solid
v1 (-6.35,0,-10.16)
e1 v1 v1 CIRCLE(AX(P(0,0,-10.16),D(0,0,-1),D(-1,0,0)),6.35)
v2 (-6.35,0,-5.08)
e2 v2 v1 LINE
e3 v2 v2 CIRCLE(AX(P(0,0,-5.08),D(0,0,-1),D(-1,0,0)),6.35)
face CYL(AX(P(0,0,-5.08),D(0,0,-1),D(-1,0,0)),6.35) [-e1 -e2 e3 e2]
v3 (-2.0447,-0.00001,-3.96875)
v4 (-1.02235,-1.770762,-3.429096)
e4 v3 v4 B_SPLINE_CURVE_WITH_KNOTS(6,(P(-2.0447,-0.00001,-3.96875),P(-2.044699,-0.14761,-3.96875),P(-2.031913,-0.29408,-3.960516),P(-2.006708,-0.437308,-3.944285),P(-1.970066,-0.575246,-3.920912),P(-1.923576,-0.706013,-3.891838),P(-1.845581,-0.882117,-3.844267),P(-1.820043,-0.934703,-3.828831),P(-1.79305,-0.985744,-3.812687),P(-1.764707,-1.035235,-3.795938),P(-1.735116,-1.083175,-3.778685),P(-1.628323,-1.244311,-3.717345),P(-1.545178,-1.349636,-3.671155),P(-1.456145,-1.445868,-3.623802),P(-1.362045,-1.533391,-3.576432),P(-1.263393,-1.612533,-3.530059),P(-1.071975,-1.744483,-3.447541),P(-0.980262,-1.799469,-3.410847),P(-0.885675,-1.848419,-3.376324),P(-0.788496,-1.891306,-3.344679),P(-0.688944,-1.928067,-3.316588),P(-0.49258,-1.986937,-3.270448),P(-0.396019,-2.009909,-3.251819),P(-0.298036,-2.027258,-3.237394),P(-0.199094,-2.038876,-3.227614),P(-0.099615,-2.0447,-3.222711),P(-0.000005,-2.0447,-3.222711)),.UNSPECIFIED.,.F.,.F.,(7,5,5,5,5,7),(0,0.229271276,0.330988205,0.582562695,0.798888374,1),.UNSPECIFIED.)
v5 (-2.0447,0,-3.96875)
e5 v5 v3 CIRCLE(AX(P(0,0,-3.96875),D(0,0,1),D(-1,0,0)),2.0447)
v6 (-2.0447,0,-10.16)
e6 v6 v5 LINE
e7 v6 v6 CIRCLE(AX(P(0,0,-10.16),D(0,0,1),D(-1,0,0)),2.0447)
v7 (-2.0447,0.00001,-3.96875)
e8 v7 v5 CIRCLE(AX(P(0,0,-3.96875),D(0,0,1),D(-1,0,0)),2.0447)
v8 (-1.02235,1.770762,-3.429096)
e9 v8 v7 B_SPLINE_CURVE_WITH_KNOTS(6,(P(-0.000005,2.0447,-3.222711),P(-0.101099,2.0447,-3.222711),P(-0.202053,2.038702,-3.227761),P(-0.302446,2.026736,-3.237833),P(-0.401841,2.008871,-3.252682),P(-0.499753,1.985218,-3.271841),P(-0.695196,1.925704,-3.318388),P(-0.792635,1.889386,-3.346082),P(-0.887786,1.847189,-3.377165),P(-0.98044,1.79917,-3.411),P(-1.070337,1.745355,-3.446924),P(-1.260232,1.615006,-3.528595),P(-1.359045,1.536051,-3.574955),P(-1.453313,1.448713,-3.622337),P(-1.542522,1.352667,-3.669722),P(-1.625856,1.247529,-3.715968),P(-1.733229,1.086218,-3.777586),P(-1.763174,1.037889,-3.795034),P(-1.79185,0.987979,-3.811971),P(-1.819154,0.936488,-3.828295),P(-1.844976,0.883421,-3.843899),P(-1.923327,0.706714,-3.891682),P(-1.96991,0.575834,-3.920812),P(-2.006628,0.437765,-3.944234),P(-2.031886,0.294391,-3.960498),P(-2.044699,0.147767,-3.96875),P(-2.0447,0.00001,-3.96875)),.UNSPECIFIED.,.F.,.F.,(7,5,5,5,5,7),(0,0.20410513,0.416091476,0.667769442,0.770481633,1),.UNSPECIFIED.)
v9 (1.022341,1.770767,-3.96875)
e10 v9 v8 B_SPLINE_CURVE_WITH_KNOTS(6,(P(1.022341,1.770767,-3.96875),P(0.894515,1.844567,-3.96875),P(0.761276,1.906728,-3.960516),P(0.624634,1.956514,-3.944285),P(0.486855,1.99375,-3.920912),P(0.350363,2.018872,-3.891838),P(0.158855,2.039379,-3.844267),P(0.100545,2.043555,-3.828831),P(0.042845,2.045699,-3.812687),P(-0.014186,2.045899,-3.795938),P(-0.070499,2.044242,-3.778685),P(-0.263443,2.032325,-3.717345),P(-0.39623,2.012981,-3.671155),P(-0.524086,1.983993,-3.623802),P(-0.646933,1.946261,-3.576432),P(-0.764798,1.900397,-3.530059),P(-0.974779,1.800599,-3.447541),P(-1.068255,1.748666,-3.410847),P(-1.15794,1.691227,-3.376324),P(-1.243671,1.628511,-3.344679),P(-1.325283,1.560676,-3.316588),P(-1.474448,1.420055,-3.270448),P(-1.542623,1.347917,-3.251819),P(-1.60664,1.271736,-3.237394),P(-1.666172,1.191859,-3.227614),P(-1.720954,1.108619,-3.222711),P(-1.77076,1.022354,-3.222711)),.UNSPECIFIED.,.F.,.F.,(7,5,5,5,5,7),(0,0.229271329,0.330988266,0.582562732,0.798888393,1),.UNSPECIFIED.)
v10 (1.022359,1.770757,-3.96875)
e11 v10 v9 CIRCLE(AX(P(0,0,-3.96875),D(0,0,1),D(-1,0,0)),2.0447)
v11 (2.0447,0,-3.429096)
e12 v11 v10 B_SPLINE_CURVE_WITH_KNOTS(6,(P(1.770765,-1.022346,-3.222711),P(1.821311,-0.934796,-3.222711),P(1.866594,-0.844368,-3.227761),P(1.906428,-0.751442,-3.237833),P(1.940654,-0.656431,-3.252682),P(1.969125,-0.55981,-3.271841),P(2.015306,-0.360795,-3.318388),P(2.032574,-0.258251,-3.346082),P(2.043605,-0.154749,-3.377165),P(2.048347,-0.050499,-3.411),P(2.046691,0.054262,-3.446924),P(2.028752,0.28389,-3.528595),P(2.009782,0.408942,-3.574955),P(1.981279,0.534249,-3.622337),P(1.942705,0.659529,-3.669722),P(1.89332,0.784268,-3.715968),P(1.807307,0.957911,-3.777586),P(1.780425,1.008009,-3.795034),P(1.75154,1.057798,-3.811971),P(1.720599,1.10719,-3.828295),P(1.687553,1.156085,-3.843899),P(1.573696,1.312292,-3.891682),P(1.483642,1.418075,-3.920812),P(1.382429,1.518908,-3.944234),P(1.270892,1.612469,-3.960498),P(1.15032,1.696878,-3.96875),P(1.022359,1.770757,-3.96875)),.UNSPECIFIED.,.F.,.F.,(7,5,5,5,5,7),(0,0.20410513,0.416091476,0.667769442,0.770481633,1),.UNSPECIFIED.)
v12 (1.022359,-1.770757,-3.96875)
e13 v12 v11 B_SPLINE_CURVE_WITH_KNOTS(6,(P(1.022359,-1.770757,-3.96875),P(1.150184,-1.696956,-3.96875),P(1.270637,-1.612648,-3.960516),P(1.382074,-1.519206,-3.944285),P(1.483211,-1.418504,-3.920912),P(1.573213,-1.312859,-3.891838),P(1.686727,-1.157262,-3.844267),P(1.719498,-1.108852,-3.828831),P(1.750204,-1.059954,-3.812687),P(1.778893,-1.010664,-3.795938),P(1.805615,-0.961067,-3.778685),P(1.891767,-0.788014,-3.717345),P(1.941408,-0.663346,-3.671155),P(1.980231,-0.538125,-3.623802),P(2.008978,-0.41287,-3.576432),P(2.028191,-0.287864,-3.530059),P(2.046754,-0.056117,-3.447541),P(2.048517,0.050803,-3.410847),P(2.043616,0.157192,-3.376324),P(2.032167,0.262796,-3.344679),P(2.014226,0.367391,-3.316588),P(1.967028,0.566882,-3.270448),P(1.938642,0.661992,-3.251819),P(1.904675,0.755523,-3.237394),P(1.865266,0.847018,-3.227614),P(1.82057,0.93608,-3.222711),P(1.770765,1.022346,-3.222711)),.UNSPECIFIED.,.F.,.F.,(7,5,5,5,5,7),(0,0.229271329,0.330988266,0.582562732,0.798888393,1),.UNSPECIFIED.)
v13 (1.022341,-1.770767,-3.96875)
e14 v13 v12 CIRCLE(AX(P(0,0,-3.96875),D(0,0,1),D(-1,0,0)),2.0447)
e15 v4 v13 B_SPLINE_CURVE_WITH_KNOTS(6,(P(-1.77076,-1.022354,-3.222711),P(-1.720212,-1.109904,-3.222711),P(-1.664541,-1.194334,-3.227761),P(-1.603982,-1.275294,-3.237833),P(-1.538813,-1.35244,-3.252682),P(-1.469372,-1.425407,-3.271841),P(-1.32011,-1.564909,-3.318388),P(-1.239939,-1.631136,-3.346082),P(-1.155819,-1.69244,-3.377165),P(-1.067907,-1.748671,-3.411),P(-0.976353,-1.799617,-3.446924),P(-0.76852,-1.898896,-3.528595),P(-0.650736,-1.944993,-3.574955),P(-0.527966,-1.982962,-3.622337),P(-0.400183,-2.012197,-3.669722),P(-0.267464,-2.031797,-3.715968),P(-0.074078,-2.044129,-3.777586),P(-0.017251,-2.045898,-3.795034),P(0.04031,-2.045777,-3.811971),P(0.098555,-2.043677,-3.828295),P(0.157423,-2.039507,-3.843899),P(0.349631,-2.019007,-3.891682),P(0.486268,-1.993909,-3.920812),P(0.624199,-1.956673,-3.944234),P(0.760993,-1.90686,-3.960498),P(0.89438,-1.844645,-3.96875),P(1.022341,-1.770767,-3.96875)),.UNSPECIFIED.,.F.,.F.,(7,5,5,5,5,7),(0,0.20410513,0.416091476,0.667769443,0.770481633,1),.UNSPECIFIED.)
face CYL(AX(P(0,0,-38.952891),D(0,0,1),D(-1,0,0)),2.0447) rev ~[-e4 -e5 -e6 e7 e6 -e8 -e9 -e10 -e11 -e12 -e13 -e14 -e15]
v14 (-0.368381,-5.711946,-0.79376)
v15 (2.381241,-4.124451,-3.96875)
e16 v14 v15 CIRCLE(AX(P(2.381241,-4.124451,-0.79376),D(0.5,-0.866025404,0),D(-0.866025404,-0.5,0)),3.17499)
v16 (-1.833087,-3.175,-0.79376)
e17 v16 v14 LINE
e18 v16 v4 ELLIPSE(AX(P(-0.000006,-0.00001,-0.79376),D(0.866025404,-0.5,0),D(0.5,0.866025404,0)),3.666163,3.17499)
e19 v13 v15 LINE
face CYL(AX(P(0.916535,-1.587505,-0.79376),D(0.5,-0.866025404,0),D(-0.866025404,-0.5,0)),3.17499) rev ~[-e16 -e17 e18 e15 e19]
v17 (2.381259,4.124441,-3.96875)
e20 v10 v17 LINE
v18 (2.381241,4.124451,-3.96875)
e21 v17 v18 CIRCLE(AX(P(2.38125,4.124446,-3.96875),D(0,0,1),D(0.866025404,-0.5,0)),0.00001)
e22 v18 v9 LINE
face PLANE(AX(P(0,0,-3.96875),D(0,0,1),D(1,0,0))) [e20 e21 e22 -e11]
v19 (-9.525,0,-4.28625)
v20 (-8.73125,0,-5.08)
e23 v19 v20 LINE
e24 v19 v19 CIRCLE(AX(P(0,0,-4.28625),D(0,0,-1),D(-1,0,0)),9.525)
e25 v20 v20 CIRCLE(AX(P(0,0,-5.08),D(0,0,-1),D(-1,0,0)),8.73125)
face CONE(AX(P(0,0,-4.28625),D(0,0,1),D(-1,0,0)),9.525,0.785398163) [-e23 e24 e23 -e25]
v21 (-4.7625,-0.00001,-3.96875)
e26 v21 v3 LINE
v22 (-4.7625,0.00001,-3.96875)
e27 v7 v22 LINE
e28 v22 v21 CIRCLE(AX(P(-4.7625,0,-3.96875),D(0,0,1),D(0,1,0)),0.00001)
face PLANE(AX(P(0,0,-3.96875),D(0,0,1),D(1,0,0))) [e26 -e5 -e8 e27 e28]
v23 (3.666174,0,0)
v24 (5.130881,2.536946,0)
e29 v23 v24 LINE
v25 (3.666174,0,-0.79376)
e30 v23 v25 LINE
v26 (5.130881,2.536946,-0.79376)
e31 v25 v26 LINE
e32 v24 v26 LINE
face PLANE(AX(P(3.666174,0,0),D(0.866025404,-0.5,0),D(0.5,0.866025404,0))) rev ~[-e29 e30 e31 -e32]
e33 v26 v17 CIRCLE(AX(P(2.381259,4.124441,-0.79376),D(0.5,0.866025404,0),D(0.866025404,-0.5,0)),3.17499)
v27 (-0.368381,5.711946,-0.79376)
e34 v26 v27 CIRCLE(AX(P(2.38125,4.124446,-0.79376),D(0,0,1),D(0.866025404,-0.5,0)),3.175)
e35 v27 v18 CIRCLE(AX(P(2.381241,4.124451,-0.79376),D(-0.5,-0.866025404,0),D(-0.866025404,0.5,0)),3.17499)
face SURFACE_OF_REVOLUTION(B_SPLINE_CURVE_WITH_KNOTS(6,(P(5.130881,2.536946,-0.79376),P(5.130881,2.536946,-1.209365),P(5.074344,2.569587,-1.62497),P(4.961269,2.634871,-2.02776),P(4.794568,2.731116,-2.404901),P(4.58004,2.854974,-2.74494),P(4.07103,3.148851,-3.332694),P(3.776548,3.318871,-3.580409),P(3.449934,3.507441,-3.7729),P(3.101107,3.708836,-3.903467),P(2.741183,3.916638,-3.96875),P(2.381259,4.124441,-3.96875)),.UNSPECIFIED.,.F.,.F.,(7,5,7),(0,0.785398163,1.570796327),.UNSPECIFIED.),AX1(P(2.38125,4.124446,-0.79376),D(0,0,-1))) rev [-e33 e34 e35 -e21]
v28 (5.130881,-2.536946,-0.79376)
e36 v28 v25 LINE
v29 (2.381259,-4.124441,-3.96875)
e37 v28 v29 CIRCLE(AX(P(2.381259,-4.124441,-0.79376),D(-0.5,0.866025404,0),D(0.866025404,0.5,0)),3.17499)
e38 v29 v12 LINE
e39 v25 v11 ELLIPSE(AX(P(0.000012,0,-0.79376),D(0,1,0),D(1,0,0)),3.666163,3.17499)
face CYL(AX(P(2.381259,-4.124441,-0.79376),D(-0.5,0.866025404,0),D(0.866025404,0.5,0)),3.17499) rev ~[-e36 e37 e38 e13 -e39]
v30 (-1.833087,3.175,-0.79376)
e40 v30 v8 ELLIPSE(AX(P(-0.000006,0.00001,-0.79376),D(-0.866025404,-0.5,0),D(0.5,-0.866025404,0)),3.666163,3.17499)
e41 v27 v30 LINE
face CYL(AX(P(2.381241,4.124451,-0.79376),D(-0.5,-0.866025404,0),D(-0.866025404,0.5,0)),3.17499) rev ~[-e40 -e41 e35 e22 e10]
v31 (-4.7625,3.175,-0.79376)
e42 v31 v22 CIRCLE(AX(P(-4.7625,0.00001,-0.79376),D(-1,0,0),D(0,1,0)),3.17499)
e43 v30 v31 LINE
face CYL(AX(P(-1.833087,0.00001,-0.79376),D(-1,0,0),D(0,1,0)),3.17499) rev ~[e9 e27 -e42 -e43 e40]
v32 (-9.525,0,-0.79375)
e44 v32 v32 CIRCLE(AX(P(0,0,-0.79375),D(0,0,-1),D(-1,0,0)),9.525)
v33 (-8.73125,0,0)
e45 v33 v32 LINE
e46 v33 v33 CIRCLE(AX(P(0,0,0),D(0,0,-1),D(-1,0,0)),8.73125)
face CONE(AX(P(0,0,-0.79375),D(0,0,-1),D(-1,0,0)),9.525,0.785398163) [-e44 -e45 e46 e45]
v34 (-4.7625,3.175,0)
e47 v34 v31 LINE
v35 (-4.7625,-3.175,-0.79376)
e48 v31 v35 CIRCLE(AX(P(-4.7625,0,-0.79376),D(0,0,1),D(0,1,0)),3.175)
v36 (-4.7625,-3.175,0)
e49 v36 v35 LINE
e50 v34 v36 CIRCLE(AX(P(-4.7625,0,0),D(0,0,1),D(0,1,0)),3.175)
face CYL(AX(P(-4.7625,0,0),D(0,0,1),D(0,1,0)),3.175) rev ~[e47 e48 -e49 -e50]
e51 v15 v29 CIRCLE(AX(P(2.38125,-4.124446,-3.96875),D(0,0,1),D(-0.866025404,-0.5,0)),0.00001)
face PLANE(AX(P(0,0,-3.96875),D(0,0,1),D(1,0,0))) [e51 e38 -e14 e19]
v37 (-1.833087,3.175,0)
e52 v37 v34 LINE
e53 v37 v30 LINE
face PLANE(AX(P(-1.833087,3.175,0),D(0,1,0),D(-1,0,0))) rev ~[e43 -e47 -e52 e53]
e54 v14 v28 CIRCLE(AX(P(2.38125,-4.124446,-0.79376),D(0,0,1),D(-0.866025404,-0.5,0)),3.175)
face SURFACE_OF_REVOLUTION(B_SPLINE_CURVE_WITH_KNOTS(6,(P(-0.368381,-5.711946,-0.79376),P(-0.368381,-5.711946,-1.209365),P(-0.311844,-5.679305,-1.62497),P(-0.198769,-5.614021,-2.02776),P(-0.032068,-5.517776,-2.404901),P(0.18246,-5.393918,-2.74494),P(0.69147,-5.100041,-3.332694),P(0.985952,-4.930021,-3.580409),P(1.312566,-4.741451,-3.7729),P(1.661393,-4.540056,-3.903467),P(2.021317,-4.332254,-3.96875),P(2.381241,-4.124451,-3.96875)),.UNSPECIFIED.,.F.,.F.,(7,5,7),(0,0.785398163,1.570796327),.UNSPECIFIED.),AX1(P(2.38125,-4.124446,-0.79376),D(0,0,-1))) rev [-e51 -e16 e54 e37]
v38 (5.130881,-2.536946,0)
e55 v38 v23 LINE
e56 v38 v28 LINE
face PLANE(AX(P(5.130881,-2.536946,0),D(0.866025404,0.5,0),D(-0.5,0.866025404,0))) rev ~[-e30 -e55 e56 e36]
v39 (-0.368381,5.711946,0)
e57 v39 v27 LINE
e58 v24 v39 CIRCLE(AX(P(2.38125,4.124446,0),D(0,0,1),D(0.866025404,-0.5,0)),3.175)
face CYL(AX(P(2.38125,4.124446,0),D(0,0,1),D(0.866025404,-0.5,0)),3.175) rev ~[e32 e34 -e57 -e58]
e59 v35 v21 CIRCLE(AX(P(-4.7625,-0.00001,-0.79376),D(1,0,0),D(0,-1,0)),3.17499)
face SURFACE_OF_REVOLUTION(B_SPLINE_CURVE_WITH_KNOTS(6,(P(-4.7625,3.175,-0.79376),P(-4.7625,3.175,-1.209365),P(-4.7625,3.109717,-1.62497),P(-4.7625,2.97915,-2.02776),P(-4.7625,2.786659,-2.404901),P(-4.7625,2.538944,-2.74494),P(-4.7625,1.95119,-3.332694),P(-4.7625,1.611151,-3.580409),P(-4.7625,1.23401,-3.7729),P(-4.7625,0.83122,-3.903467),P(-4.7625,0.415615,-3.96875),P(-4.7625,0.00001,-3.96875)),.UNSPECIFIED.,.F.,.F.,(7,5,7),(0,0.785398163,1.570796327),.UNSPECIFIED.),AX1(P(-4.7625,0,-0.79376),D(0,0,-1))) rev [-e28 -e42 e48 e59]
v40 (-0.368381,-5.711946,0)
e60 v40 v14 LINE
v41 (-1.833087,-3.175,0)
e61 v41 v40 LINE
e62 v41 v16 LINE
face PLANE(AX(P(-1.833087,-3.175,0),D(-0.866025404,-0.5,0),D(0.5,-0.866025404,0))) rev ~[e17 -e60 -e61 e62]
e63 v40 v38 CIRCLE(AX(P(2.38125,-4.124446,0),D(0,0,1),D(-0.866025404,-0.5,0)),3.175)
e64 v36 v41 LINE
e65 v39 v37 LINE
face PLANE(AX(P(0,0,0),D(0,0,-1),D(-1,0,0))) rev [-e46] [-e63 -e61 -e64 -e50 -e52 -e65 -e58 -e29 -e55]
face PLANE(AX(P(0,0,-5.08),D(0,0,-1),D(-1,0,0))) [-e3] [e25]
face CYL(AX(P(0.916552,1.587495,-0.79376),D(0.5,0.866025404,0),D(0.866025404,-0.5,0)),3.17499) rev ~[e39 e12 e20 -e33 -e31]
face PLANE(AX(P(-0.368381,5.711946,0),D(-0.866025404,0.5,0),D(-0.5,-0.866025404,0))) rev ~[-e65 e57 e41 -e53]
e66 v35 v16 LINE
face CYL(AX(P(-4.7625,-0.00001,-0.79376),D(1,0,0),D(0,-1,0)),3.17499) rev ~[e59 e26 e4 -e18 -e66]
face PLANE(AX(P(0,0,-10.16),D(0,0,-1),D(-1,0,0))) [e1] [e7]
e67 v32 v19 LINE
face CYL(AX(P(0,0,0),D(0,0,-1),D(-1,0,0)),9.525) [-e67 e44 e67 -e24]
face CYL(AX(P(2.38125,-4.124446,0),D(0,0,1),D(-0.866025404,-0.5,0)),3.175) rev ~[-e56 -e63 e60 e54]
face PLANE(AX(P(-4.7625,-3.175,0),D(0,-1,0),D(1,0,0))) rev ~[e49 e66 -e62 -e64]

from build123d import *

# Parameters (mm, degrees)
F2_SIZE  = 0.79375
F4_DEPTH = 3.96875
F5_R     = 3.17499
F7_D     = 4.0894


# Not quite as in the source:
# - a fillet or chamfer is up to 0.001 mm smaller than in the source, because OpenCascade refuses the exact size


with BuildPart() as f1:
    # F0 (on Front) → F1 (revolve)
    with BuildSketch(Plane.XZ):
        Polygon((-6.35, -10.16), (0, -10.16), (0, 0), (-9.525, 0), (-9.525, -5.08), (-6.35, -5.08), align=None)
    revolve(axis=Axis((0, 0, -1.025330542), (0, 0, -1)))

    # F2
    f2_edges = [f1.edges().sort_by_distance(p)[0] for p in [
        (9.525, 0, 0),
        (9.525, 0, -5.08),
    ]]
    chamfer(f2_edges, length=F2_SIZE)

    # F3 (on face) → F4 (cut)
    with BuildSketch(Plane.XY):
        with BuildLine():
            Line((-4.7625, -3.175), (-1.8330871047, -3.175))
            Line((-1.8330871047, -3.175), (-0.368380657, -5.7119459855))
            ThreePointArc((-0.368380657, -5.7119459855), (3.96875, -6.8740766425), (5.130880657, -2.5369459855))
            Line((5.130880657, -2.5369459855), (3.6661742094, 0))
            Line((3.6661742094, 0), (5.130880657, 2.5369459855))
            ThreePointArc((5.130880657, 2.5369459855), (3.96875, 6.8740766425), (-0.368380657, 5.7119459855))
            Line((-0.368380657, 5.7119459855), (-1.8330871047, 3.175))
            Line((-1.8330871047, 3.175), (-4.7625, 3.175))
            ThreePointArc((-4.7625, 3.175), (-7.9375, 0), (-4.7625, -3.175))
        make_face()
    extrude(amount=-F4_DEPTH, mode=Mode.SUBTRACT)

    # F5 (radius 3.175 in the source; OpenCascade refuses exactly that, so slightly less here)
    f5_edges = [f1.edges().sort_by_distance(p)[0] for p in [
        (3.96875, 6.874077, -3.96875),
        (-1.100734, 4.443473, -3.96875),
        (-3.297794, 3.175, -3.96875),
        (-7.9375, 0, -3.96875),
        (-3.297794, -3.175, -3.96875),
        (-1.100734, -4.443473, -3.96875),
        (3.96875, -6.874077, -3.96875),
        (4.398527, -1.268473, -3.96875),
        (4.398527, 1.268473, -3.96875),
    ]]
    fillet(f5_edges, radius=F5_R)

    # F7 (through all)
    with Locations(Plane(origin=(0, 0, -10.16), x_dir=(1, 0, 0), z_dir=(0, 0, -1))):
        with Locations((0, 0)):
            Hole(F7_D / 2)


solid = f1.part
